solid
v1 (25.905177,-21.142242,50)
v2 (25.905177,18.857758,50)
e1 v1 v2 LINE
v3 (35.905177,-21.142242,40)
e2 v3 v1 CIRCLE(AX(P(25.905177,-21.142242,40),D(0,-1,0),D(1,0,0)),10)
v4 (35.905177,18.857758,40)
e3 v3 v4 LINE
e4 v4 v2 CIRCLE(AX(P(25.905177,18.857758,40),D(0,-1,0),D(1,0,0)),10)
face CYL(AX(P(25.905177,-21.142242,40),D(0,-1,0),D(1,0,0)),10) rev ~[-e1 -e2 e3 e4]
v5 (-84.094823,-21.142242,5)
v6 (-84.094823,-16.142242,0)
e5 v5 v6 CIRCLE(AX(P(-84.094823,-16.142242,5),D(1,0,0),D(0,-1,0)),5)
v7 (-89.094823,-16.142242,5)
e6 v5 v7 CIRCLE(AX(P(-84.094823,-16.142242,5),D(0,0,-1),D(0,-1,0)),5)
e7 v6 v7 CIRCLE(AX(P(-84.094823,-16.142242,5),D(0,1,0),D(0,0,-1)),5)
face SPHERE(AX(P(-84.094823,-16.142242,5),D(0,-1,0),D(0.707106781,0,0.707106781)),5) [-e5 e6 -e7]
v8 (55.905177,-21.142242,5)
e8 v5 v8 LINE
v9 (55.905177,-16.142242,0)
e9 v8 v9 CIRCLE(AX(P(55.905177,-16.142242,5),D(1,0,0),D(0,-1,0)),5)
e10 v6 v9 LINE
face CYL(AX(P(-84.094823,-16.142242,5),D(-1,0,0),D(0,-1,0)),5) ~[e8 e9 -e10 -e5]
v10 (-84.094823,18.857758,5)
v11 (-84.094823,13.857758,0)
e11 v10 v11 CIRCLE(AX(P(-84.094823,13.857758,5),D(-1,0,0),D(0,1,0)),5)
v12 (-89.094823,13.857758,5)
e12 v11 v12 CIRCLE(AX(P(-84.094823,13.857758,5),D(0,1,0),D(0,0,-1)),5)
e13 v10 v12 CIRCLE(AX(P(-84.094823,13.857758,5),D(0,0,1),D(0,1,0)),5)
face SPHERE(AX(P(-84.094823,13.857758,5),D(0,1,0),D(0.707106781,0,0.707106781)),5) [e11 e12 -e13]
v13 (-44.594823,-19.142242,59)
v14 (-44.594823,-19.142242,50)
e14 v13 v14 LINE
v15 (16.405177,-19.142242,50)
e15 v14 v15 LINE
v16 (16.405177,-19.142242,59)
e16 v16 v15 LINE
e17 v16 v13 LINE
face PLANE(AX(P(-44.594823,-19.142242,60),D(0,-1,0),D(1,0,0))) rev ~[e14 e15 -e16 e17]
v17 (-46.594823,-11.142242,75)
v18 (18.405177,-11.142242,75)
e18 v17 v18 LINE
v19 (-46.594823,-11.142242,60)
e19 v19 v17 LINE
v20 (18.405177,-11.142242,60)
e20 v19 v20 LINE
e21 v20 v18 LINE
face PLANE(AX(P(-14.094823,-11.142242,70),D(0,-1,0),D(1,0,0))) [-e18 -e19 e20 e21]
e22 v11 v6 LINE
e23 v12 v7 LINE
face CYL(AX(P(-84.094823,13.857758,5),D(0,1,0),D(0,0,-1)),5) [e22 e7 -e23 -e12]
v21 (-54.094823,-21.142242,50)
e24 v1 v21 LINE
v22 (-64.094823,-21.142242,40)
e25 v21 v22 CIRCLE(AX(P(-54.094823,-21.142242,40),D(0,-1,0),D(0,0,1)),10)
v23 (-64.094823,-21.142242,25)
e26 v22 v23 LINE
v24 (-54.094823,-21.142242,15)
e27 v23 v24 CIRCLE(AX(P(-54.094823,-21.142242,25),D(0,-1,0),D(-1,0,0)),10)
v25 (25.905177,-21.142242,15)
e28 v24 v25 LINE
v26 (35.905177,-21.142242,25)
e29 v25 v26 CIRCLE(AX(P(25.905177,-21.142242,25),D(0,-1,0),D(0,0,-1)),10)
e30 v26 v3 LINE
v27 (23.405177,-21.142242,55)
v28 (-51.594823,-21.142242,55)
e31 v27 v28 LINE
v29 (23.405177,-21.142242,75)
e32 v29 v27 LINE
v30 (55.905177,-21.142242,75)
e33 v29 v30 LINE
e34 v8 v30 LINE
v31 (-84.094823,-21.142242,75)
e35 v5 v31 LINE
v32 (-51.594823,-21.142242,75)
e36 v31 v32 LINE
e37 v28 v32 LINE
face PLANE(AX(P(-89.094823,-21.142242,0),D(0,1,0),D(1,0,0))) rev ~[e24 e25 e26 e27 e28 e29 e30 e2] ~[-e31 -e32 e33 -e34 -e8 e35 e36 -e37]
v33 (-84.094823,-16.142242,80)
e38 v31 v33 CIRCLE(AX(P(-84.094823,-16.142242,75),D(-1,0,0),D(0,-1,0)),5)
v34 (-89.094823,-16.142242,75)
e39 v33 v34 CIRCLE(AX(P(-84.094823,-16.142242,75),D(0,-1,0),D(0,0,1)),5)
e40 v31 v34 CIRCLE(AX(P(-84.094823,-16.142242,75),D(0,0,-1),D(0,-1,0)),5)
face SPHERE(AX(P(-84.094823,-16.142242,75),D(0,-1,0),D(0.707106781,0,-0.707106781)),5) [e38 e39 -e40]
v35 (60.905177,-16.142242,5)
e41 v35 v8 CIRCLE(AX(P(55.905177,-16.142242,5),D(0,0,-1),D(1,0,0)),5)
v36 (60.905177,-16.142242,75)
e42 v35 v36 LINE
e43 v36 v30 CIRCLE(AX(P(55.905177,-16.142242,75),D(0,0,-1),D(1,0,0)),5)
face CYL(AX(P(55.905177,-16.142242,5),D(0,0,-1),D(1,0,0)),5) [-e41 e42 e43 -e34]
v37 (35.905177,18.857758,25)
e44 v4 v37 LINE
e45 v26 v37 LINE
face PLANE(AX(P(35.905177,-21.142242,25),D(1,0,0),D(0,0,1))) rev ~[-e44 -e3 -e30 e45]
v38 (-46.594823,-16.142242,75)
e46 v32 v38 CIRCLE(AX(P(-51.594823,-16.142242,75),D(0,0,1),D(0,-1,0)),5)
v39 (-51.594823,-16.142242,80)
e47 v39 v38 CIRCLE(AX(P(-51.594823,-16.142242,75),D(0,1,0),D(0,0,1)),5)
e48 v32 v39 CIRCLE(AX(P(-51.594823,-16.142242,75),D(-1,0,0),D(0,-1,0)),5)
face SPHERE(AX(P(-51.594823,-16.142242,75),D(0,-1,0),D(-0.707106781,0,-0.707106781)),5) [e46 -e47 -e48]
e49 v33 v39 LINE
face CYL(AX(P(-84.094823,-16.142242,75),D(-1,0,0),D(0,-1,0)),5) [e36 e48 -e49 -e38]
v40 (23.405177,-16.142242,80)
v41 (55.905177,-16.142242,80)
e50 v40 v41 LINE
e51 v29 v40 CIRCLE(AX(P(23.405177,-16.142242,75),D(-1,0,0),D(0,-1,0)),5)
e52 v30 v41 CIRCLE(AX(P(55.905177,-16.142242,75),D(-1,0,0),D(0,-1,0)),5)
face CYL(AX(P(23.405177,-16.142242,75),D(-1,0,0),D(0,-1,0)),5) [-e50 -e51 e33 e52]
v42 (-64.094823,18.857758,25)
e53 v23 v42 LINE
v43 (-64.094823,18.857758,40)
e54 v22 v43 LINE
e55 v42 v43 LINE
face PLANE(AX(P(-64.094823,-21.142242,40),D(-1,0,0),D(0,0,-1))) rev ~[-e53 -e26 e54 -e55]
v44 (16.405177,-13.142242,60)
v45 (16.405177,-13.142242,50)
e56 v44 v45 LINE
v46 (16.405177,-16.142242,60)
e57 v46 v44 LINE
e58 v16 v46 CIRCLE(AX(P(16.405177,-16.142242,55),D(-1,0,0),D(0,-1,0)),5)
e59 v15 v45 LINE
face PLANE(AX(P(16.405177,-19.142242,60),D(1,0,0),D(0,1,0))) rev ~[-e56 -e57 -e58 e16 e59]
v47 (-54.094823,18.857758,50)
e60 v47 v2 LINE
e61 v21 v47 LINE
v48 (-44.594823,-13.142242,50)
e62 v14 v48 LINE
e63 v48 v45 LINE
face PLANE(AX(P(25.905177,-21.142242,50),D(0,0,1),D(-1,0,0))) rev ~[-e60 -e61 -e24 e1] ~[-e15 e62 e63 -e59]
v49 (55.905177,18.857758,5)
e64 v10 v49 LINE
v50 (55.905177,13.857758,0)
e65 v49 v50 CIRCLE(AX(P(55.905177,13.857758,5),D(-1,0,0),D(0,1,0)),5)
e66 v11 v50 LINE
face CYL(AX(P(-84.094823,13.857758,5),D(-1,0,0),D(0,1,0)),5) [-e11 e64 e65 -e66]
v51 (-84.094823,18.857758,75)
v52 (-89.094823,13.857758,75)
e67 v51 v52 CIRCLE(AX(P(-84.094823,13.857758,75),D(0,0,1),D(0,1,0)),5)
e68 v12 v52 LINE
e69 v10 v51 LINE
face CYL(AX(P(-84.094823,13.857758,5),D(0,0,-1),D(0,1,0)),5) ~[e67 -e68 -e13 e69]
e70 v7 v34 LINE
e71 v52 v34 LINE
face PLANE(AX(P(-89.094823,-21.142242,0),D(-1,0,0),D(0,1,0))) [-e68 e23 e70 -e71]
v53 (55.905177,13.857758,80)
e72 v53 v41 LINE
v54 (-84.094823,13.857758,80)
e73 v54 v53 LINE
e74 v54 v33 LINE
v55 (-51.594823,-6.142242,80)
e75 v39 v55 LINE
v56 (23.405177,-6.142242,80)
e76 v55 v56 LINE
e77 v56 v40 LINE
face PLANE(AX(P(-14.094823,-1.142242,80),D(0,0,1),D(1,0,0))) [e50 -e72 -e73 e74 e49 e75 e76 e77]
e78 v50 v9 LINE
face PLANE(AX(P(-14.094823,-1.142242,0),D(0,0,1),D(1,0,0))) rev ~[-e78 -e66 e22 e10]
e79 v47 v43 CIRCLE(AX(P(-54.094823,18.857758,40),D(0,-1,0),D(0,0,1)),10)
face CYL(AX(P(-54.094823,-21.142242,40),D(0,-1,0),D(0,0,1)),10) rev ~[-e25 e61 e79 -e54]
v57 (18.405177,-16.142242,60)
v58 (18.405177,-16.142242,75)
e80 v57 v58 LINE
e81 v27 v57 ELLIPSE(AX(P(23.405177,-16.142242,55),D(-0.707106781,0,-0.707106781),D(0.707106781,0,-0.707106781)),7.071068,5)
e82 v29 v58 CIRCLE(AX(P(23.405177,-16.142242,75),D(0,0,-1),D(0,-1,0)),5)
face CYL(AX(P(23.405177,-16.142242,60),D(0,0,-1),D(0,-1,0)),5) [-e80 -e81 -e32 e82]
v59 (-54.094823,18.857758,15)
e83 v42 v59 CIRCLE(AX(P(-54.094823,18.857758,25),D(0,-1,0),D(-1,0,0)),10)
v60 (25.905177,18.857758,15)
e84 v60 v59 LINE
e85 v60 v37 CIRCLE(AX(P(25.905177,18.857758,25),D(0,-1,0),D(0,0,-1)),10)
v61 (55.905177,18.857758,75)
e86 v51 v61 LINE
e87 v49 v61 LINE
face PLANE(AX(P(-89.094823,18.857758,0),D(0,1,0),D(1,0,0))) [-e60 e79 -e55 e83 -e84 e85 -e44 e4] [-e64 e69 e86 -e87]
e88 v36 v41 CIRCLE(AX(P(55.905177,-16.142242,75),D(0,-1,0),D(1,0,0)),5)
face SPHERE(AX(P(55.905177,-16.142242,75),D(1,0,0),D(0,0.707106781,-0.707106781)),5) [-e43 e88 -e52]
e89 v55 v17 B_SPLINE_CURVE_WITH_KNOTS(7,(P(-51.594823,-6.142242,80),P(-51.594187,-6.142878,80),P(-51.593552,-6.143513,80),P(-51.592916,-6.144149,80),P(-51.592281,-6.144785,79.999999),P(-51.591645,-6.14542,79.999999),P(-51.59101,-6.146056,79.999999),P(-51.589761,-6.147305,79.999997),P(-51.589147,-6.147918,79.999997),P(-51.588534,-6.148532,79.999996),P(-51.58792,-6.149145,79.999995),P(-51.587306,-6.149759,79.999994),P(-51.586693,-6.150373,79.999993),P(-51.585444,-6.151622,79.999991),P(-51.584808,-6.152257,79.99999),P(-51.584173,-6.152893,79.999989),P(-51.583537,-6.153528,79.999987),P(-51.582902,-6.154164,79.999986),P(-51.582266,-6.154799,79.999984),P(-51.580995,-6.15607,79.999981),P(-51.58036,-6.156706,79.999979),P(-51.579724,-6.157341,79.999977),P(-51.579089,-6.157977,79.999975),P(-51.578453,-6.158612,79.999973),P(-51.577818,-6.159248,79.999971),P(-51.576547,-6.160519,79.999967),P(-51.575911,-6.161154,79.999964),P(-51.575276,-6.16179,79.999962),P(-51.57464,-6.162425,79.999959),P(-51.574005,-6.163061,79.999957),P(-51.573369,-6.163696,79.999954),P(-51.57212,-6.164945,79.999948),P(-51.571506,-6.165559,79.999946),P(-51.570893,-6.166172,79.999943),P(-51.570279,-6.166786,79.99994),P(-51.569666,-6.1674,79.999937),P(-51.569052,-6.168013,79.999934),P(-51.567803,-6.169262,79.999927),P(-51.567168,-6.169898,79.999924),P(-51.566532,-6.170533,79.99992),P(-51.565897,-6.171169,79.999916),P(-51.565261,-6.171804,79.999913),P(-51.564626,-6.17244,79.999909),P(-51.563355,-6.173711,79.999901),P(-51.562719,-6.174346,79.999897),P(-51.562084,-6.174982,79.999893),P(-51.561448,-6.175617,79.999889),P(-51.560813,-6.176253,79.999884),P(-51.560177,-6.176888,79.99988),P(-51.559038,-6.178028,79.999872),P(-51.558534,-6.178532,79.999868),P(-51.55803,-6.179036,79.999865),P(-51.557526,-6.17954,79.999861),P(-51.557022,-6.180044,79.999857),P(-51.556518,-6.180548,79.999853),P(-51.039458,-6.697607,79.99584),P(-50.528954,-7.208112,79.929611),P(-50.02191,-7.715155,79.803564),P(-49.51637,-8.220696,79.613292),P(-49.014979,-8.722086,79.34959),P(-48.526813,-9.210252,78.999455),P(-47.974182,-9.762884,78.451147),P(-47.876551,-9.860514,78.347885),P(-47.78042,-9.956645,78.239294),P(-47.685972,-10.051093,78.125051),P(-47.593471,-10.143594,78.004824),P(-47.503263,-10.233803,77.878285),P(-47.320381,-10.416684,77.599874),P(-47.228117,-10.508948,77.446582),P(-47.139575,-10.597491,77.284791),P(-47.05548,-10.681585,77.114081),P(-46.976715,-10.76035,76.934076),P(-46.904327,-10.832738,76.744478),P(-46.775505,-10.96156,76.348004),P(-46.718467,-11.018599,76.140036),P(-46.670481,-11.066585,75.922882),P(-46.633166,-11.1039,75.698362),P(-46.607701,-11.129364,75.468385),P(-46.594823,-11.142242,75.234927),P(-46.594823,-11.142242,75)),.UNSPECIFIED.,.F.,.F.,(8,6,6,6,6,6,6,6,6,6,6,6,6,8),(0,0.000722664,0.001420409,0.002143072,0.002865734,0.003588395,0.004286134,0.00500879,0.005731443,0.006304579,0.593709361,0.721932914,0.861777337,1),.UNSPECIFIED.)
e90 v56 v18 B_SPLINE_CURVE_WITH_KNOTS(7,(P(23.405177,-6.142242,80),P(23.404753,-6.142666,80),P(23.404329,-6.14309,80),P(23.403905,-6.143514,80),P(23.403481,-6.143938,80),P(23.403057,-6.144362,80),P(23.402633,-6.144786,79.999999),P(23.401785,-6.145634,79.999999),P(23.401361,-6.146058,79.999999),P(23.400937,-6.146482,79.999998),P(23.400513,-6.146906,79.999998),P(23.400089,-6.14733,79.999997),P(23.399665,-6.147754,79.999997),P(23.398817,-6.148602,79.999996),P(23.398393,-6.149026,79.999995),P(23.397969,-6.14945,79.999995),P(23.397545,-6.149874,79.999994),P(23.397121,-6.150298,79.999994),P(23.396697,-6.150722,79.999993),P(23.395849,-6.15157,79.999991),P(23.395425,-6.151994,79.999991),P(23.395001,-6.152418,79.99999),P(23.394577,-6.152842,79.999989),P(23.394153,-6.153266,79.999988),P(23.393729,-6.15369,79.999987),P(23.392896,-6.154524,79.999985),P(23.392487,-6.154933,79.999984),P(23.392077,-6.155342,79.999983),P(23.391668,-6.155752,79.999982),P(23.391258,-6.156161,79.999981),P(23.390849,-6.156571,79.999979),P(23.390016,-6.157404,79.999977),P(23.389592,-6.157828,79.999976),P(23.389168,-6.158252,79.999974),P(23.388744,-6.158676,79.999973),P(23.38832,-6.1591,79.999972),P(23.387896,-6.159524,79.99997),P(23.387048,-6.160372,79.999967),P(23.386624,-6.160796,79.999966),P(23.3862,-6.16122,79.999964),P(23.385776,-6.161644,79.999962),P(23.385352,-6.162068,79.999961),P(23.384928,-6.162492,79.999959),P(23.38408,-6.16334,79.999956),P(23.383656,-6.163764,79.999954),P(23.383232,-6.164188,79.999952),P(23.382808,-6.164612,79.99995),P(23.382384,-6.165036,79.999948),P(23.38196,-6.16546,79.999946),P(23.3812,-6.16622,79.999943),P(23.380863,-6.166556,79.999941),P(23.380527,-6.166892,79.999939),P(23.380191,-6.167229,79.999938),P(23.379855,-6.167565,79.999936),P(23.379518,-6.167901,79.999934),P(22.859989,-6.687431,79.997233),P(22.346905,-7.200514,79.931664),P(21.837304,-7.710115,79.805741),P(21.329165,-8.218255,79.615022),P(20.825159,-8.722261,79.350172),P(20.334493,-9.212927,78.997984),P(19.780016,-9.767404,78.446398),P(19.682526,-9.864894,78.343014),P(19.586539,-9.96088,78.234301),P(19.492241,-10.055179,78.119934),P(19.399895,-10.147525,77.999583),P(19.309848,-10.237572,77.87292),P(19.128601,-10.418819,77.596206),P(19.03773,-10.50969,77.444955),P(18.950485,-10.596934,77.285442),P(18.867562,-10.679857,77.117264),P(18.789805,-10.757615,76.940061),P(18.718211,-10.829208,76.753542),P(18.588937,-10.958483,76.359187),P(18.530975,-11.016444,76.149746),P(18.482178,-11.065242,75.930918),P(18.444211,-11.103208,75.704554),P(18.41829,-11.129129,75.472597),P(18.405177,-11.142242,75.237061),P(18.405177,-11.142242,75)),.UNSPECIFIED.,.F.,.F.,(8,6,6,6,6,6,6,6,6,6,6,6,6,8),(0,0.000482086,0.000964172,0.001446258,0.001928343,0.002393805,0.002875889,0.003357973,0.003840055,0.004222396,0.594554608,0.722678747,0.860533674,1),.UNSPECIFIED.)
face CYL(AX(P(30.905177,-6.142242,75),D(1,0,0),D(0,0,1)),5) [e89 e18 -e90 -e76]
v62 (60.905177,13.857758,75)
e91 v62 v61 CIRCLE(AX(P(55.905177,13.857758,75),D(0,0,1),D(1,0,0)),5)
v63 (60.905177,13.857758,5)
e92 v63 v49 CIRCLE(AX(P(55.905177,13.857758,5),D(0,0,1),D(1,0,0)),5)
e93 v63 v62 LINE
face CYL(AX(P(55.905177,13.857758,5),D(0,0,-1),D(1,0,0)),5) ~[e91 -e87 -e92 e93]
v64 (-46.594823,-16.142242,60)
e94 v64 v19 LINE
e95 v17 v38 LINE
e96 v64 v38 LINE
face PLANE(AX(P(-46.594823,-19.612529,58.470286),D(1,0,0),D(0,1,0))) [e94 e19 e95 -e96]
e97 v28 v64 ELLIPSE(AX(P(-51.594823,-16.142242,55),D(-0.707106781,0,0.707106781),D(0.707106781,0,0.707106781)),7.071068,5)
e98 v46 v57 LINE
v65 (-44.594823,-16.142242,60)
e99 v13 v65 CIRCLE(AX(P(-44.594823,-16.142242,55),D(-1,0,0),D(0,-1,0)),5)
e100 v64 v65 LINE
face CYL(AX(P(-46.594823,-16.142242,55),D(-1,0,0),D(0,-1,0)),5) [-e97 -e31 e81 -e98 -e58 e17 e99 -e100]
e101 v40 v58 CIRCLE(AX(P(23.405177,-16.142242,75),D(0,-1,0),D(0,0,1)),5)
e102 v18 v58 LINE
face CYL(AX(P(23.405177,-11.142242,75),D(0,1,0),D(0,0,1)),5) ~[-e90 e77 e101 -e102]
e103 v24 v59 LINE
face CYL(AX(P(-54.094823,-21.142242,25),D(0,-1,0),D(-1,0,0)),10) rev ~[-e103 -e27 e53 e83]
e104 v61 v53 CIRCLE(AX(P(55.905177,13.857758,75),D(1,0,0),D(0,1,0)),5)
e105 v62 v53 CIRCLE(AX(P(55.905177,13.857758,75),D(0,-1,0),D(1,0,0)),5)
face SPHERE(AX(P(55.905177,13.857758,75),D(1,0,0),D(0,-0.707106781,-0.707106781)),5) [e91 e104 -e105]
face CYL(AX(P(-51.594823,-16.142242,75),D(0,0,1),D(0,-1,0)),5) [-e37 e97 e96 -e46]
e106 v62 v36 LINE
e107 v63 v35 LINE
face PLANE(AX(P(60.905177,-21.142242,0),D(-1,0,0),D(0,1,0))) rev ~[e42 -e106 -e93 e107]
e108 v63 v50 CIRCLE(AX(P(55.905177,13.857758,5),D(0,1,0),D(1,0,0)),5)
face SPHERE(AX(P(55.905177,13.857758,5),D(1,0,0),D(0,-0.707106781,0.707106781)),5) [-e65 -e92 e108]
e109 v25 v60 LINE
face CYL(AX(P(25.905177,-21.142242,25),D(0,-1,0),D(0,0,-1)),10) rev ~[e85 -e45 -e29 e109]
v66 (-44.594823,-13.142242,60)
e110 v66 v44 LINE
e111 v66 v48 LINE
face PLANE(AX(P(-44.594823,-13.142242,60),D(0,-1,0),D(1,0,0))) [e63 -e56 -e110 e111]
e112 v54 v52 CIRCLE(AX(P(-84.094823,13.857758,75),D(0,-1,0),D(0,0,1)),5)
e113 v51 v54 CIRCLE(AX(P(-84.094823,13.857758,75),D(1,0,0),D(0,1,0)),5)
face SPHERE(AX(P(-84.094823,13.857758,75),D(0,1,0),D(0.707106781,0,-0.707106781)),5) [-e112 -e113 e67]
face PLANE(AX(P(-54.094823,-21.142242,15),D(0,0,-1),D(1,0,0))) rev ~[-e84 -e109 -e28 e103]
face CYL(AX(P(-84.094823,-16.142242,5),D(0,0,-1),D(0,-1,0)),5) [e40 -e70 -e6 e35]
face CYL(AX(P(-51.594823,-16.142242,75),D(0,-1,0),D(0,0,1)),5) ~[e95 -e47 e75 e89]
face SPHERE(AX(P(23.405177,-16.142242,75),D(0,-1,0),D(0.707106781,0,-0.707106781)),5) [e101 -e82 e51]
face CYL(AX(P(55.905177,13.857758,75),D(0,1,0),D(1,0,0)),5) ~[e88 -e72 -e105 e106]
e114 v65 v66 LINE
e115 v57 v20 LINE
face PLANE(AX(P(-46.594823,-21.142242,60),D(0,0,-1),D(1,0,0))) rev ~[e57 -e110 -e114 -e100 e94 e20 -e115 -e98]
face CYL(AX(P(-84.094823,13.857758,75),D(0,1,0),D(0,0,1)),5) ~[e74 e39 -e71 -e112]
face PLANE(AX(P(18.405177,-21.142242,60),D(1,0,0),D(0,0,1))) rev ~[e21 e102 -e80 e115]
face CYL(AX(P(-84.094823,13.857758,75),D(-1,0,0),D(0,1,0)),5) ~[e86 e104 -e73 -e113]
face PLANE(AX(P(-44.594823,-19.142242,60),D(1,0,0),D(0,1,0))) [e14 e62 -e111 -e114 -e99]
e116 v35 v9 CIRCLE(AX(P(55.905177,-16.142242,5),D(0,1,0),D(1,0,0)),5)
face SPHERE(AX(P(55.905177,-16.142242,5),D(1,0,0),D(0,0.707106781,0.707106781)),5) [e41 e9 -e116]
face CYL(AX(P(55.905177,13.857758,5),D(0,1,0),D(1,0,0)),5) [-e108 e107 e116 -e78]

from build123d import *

# Parameters (mm, degrees)
F0_W          = 150
F0_H          = 40
F1_DEPTH      = 80
F2_W          = 65
F2_H          = 20
F3_DEPTH      = 10
F5_DEPTH      = 287
F6_W          = 61
F6_H          = 6
F7_DEPTH      = 25
F8_T1_DEPTH   = 65
F8_T3_DEPTH   = 70
F8_T5_DEPTH   = 32.5
F8_T7_DEPTH   = 32.5
F8_T9_DEPTH   = 30
F8_T11_DEPTH  = 140
F8_T13_DEPTH  = 15
F8_T15_DEPTH  = 5
F8_S19_W      = 5
F8_S19_H      = 5
F8_T20_DEPTH  = 5
F8_S25_W      = 5
F8_S25_H      = 5
F8_T26_DEPTH  = 5
F8_S31_W      = 5
F8_S31_H      = 5
F8_T32_DEPTH  = 5
F8_S37_W      = 5
F8_S37_H      = 5
F8_T38_DEPTH  = 5
F8_S43_W      = 5
F8_S43_H      = 5
F8_T44_DEPTH  = 5
F8_S49_W      = 5
F8_S49_H      = 5
F8_T50_DEPTH  = 5
F8_S55_W      = 5
F8_S55_H      = 5
F8_T56_DEPTH  = 5
F8_S61_W      = 5
F8_S61_H      = 5
F8_T62_DEPTH  = 5
F8_S67_W      = 5
F8_S67_H      = 5
F8_T68_DEPTH  = 5
F8_S73_W      = 5
F8_S73_H      = 5
F8_T74_DEPTH  = 5
F8_T81_DEPTH  = 17.5
F8_T85_DEPTH  = 77.5
F8_T92_DEPTH  = 77.5
F8_T96_DEPTH  = 17.5
F8_T103_DEPTH = 27.5
F8_T107_DEPTH = 77.5
F8_T114_DEPTH = 27.5
F8_T118_DEPTH = 77.5


# Not quite as in the source:
# - a fillet or chamfer that OpenCascade refuses, or shapes differently, is made with other operations: its cross-section is extruded or revolved along the edge and cut away or added


with BuildPart() as f1:
    # F0 (on Top) → F1 (new body)
    with BuildSketch(Plane.XY):
        with Locations((-14.0948228538, -1.1422424763)):
            Rectangle(F0_W, F0_H)
    extrude(amount=F1_DEPTH)

    # F2 (on face) → F3 (cut)
    with BuildSketch(Plane.XZ.offset(21.1422424763)):
        with Locations((-14.0948228538, 70)):
            Rectangle(F2_W, F2_H)
    extrude(amount=-F3_DEPTH, mode=Mode.SUBTRACT)

    # F4 (on face) → F5 (cut)
    with BuildSketch(Plane.XZ.offset(21.1422424763)):
        with BuildLine():
            Line((25.9051771462, 50), (-54.0948228538, 50))
            ThreePointArc((-54.0948228538, 50), (-61.1658906657, 47.0710678119), (-64.0948228538, 40))
            Line((-64.0948228538, 40), (-64.0948228538, 25))
            ThreePointArc((-64.0948228538, 25), (-61.1658906657, 17.9289321881), (-54.0948228538, 15))
            Line((-54.0948228538, 15), (25.9051771462, 15))
            ThreePointArc((25.9051771462, 15), (32.9762449581, 17.9289321881), (35.9051771462, 25))
            Line((35.9051771462, 25), (35.9051771462, 40))
            ThreePointArc((35.9051771462, 40), (32.9762449581, 47.0710678119), (25.9051771462, 50))
        make_face()
    extrude(amount=-F5_DEPTH, mode=Mode.SUBTRACT)

    # F6 (on face) → F7 (cut)
    with BuildSketch(Plane.XY.offset(60)):
        with Locations((-14.0948228538, -16.1422424763)):
            Rectangle(F6_W, F6_H)
    extrude(amount=-F7_DEPTH, mode=Mode.SUBTRACT)

    # F8: fillet of radius 5 on 19 edges, made by hand

    # F8_s2 → F8_t1 (cut)
    with BuildSketch(Plane.YZ.offset(-46.5948228538)):
        with BuildLine():
            ThreePointArc((-6.1422424763, 80), (-9.6777763823, 78.5355339059), (-11.1422424763, 75))
            Line((-11.1422424763, 75), (-11.1422424763, 80))
            Line((-11.1422424763, 80), (-6.1422424763, 80))
        make_face()
        with BuildLine():
            ThreePointArc((-21.1422424763, 55), (-19.6777763823, 58.5355339059), (-16.1422424763, 60))
            Line((-16.1422424763, 60), (-21.1422424763, 60))
            Line((-21.1422424763, 60), (-21.1422424763, 55))
        make_face()
    extrude(amount=F8_T1_DEPTH, mode=Mode.SUBTRACT)

    # F8_s4 → F8_t3 (cut)
    with BuildSketch(Plane.XY.offset(5)):
        with BuildLine():
            ThreePointArc((-84.0948228538, -21.1422424763), (-87.6303567597, -19.6777763823), (-89.0948228538, -16.1422424763))
            Line((-89.0948228538, -16.1422424763), (-89.0948228538, -21.1422424763))
            Line((-89.0948228538, -21.1422424763), (-84.0948228538, -21.1422424763))
        make_face()
        with BuildLine():
            ThreePointArc((60.9051771462, -16.1422424763), (59.4407110521, -19.6777763823), (55.9051771462, -21.1422424763))
            Line((55.9051771462, -21.1422424763), (60.9051771462, -21.1422424763))
            Line((60.9051771462, -21.1422424763), (60.9051771462, -16.1422424763))
        make_face()
        with BuildLine():
            ThreePointArc((-84.0948228538, 18.8577575237), (-87.6303567597, 17.3932914296), (-89.0948228538, 13.8577575237))
            Line((-89.0948228538, 13.8577575237), (-89.0948228538, 18.8577575237))
            Line((-89.0948228538, 18.8577575237), (-84.0948228538, 18.8577575237))
        make_face()
        with BuildLine():
            ThreePointArc((60.9051771462, 13.8577575237), (59.4407110521, 17.3932914296), (55.9051771462, 18.8577575237))
            Line((55.9051771462, 18.8577575237), (60.9051771462, 18.8577575237))
            Line((60.9051771462, 18.8577575237), (60.9051771462, 13.8577575237))
        make_face()
    extrude(amount=F8_T3_DEPTH, mode=Mode.SUBTRACT)

    # F8_s6 → F8_t5 (cut)
    with BuildSketch(Plane.YZ.offset(23.4051771462)):
        with BuildLine():
            ThreePointArc((-21.1422424763, 75), (-19.6777763823, 78.5355339059), (-16.1422424763, 80))
            Line((-16.1422424763, 80), (-21.1422424763, 80))
            Line((-21.1422424763, 80), (-21.1422424763, 75))
        make_face()
    extrude(amount=F8_T5_DEPTH, mode=Mode.SUBTRACT)

    # F8_s8 → F8_t7 (cut)
    with BuildSketch(Plane.YZ.offset(-84.0948228538)):
        with BuildLine():
            ThreePointArc((-21.1422424763, 75), (-19.6777763823, 78.5355339059), (-16.1422424763, 80))
            Line((-16.1422424763, 80), (-21.1422424763, 80))
            Line((-21.1422424763, 80), (-21.1422424763, 75))
        make_face()
    extrude(amount=F8_T7_DEPTH, mode=Mode.SUBTRACT)

    # F8_s10 → F8_t9 (cut)
    with BuildSketch(Plane.XZ.offset(-13.8577575237)):
        with BuildLine():
            ThreePointArc((60.9051771462, 5), (59.4407110521, 1.4644660941), (55.9051771462, 0))
            Line((55.9051771462, 0), (60.9051771462, 0))
            Line((60.9051771462, 0), (60.9051771462, 5))
        make_face()
        with BuildLine():
            ThreePointArc((-84.0948228538, 0), (-87.6303567597, 1.4644660941), (-89.0948228538, 5))
            Line((-89.0948228538, 5), (-89.0948228538, 0))
            Line((-89.0948228538, 0), (-84.0948228538, 0))
        make_face()
        with BuildLine():
            ThreePointArc((-84.0948228538, 80), (-87.6303567597, 78.5355339059), (-89.0948228538, 75))
            Line((-89.0948228538, 75), (-89.0948228538, 80))
            Line((-89.0948228538, 80), (-84.0948228538, 80))
        make_face()
        with BuildLine():
            ThreePointArc((60.9051771462, 75), (59.4407110521, 78.5355339059), (55.9051771462, 80))
            Line((55.9051771462, 80), (60.9051771462, 80))
            Line((60.9051771462, 80), (60.9051771462, 75))
        make_face()
    extrude(amount=F8_T9_DEPTH, mode=Mode.SUBTRACT)

    # F8_s12 → F8_t11 (cut)
    with BuildSketch(Plane.YZ.offset(-84.0948228538)):
        with BuildLine():
            ThreePointArc((18.8577575237, 5), (17.3932914296, 1.4644660941), (13.8577575237, 0))
            Line((13.8577575237, 0), (18.8577575237, 0))
            Line((18.8577575237, 0), (18.8577575237, 5))
        make_face()
        with BuildLine():
            ThreePointArc((-21.1422424763, 5), (-19.6777763823, 1.4644660941), (-16.1422424763, 0))
            Line((-16.1422424763, 0), (-21.1422424763, 0))
            Line((-21.1422424763, 0), (-21.1422424763, 5))
        make_face()
        with BuildLine():
            ThreePointArc((18.8577575237, 75), (17.3932914296, 78.5355339059), (13.8577575237, 80))
            Line((13.8577575237, 80), (18.8577575237, 80))
            Line((18.8577575237, 80), (18.8577575237, 75))
        make_face()
    extrude(amount=F8_T11_DEPTH, mode=Mode.SUBTRACT)

    # F8_s14 → F8_t13 (cut)
    with BuildSketch(Plane.XY.offset(60)):
        with BuildLine():
            ThreePointArc((-51.5948228538, -21.1422424763), (-48.0592889479, -19.6777763823), (-46.5948228538, -16.1422424763))
            Line((-46.5948228538, -16.1422424763), (-46.5948228538, -21.1422424763))
            Line((-46.5948228538, -21.1422424763), (-51.5948228538, -21.1422424763))
        make_face()
        with BuildLine():
            ThreePointArc((23.4051771462, -21.1422424763), (19.8696432403, -19.6777763823), (18.4051771462, -16.1422424763))
            Line((18.4051771462, -16.1422424763), (18.4051771462, -21.1422424763))
            Line((18.4051771462, -21.1422424763), (23.4051771462, -21.1422424763))
        make_face()
    extrude(amount=F8_T13_DEPTH, mode=Mode.SUBTRACT)

    # F8_s16 → F8_t15 (cut)
    with BuildSketch(Plane.XZ.offset(11.1422424763)):
        with BuildLine():
            ThreePointArc((-51.5948228538, 80), (-48.0592889479, 78.5355339059), (-46.5948228538, 75))
            Line((-46.5948228538, 75), (-46.5948228538, 80))
            Line((-46.5948228538, 80), (-51.5948228538, 80))
        make_face()
        with BuildLine():
            ThreePointArc((23.4051771462, 80), (19.8696432403, 78.5355339059), (18.4051771462, 75))
            Line((18.4051771462, 75), (18.4051771462, 80))
            Line((18.4051771462, 80), (23.4051771462, 80))
        make_face()
    extrude(amount=F8_T15_DEPTH, mode=Mode.SUBTRACT)


with BuildPart() as f8_tool18:
    # F8_s19 → F8_t20 (new body)
    with BuildSketch(Plane.XZ.offset(16.1422424763)):
        with Locations((-86.5948228538, 2.5)):
            Rectangle(F8_S19_W, F8_S19_H)
    extrude(amount=F8_T20_DEPTH)

    # F8_s21 → F8_t22 (revolve, cut)
    with BuildSketch(Plane(origin=(-84.0948228538, -16.1422424763, 5), x_dir=(0.7071067812, 0, 0.7071067812), z_dir=(0.7071067812, 0, -0.7071067812))):
        with BuildLine():
            ThreePointArc((0, -5), (5, 0), (0, 5))
            Line((0, 5), (0, -5))
        make_face()
    revolve(axis=Axis((-84.0948228538, -16.1422424763, 5), (0, -1, 0)), mode=Mode.SUBTRACT)


with BuildPart() as f1_1:
    add(f1.part)

    # F8_t17: cut F8_tool18
    add(f8_tool18.part, mode=Mode.SUBTRACT)


with BuildPart() as f8_tool24:
    # F8_s25 → F8_t26 (new body)
    with BuildSketch(Plane.XZ.offset(16.1422424763)):
        with Locations((-86.5948228538, 77.5)):
            Rectangle(F8_S25_W, F8_S25_H)
    extrude(amount=F8_T26_DEPTH)

    # F8_s27 → F8_t28 (revolve, cut)
    with BuildSketch(Plane(origin=(-84.0948228538, -16.1422424763, 75), x_dir=(0.7071067812, 0, -0.7071067812), z_dir=(-0.7071067812, 0, -0.7071067812))):
        with BuildLine():
            ThreePointArc((0, -5), (5, 0), (0, 5))
            Line((0, 5), (0, -5))
        make_face()
    revolve(axis=Axis((-84.0948228538, -16.1422424763, 75), (0, -1, 0)), mode=Mode.SUBTRACT)


with BuildPart() as f1_2:
    add(f1_1.part)

    # F8_t23: cut F8_tool24
    add(f8_tool24.part, mode=Mode.SUBTRACT)


with BuildPart() as f8_tool30:
    # F8_s31 → F8_t32 (new body)
    with BuildSketch(Plane.YZ.offset(55.9051771462)):
        with Locations((-18.6422424763, 2.5)):
            Rectangle(F8_S31_W, F8_S31_H)
    extrude(amount=F8_T32_DEPTH)

    # F8_s33 → F8_t34 (revolve, cut)
    with BuildSketch(Plane(origin=(55.9051771462, -16.1422424763, 5), x_dir=(0, 0.7071067812, 0.7071067812), z_dir=(0, 0.7071067812, -0.7071067812))):
        with BuildLine():
            ThreePointArc((0, -5), (5, 0), (0, 5))
            Line((0, 5), (0, -5))
        make_face()
    revolve(axis=Axis((55.9051771462, -16.1422424763, 5), (1, 0, 0)), mode=Mode.SUBTRACT)


with BuildPart() as f1_3:
    add(f1_2.part)

    # F8_t29: cut F8_tool30
    add(f8_tool30.part, mode=Mode.SUBTRACT)


with BuildPart() as f8_tool36:
    # F8_s37 → F8_t38 (new body)
    with BuildSketch(Plane.YZ.offset(55.9051771462)):
        with Locations((-18.6422424763, 77.5)):
            Rectangle(F8_S37_W, F8_S37_H)
    extrude(amount=F8_T38_DEPTH)

    # F8_s39 → F8_t40 (revolve, cut)
    with BuildSketch(Plane(origin=(55.9051771462, -16.1422424763, 75), x_dir=(0, 0.7071067812, -0.7071067812), z_dir=(0, -0.7071067812, -0.7071067812))):
        with BuildLine():
            ThreePointArc((0, -5), (5, 0), (0, 5))
            Line((0, 5), (0, -5))
        make_face()
    revolve(axis=Axis((55.9051771462, -16.1422424763, 75), (1, 0, 0)), mode=Mode.SUBTRACT)


with BuildPart() as f1_4:
    add(f1_3.part)

    # F8_t35: cut F8_tool36
    add(f8_tool36.part, mode=Mode.SUBTRACT)


with BuildPart() as f8_tool42:
    # F8_s43 → F8_t44 (new body)
    with BuildSketch(Plane.XZ.offset(16.1422424763)):
        with Locations((20.9051771462, 77.5)):
            Rectangle(F8_S43_W, F8_S43_H)
    extrude(amount=F8_T44_DEPTH)

    # F8_s45 → F8_t46 (revolve, cut)
    with BuildSketch(Plane(origin=(23.4051771462, -16.1422424763, 75), x_dir=(0.7071067812, 0, -0.7071067812), z_dir=(-0.7071067812, 0, -0.7071067812))):
        with BuildLine():
            ThreePointArc((0, -5), (5, 0), (0, 5))
            Line((0, 5), (0, -5))
        make_face()
    revolve(axis=Axis((23.4051771462, -16.1422424763, 75), (0, -1, 0)), mode=Mode.SUBTRACT)


with BuildPart() as f1_5:
    add(f1_4.part)

    # F8_t41: cut F8_tool42
    add(f8_tool42.part, mode=Mode.SUBTRACT)


with BuildPart() as f8_tool48:
    # F8_s49 → F8_t50 (new body)
    with BuildSketch(Plane.XZ.offset(16.1422424763)):
        with Locations((-49.0948228538, 77.5)):
            Rectangle(F8_S49_W, F8_S49_H)
    extrude(amount=F8_T50_DEPTH)

    # F8_s51 → F8_t52 (revolve, cut)
    with BuildSketch(Plane(origin=(-51.5948228538, -16.1422424763, 75), x_dir=(-0.7071067812, 0, -0.7071067812), z_dir=(-0.7071067812, 0, 0.7071067812))):
        with BuildLine():
            ThreePointArc((0, -5), (5, 0), (0, 5))
            Line((0, 5), (0, -5))
        make_face()
    revolve(axis=Axis((-51.5948228538, -16.1422424763, 75), (0, -1, 0)), mode=Mode.SUBTRACT)


with BuildPart() as f1_6:
    add(f1_5.part)

    # F8_t47: cut F8_tool48
    add(f8_tool48.part, mode=Mode.SUBTRACT)


with BuildPart() as f8_tool54:
    # F8_s55 → F8_t56 (new body)
    with BuildSketch(Plane.YZ.offset(55.9051771462)):
        with Locations((16.3577575237, 2.5)):
            Rectangle(F8_S55_W, F8_S55_H)
    extrude(amount=F8_T56_DEPTH)

    # F8_s57 → F8_t58 (revolve, cut)
    with BuildSketch(Plane(origin=(55.9051771462, 13.8577575237, 5), x_dir=(0, -0.7071067812, 0.7071067812), z_dir=(0, 0.7071067812, 0.7071067812))):
        with BuildLine():
            ThreePointArc((0, -5), (5, 0), (0, 5))
            Line((0, 5), (0, -5))
        make_face()
    revolve(axis=Axis((55.9051771462, 13.8577575237, 5), (1, 0, 0)), mode=Mode.SUBTRACT)


with BuildPart() as f1_7:
    add(f1_6.part)

    # F8_t53: cut F8_tool54
    add(f8_tool54.part, mode=Mode.SUBTRACT)


with BuildPart() as f8_tool60:
    # F8_s61 → F8_t62 (new body)
    with BuildSketch(Plane.XZ.offset(-13.8577575237)):
        with Locations((-86.5948228538, 2.5)):
            Rectangle(F8_S61_W, F8_S61_H)
    extrude(amount=-F8_T62_DEPTH)

    # F8_s63 → F8_t64 (revolve, cut)
    with BuildSketch(Plane(origin=(-84.0948228538, 13.8577575237, 5), x_dir=(0.7071067812, 0, 0.7071067812), z_dir=(-0.7071067812, 0, 0.7071067812))):
        with BuildLine():
            ThreePointArc((0, -5), (5, 0), (0, 5))
            Line((0, 5), (0, -5))
        make_face()
    revolve(axis=Axis((-84.0948228538, 13.8577575237, 5), (0, 1, 0)), mode=Mode.SUBTRACT)


with BuildPart() as f1_8:
    add(f1_7.part)

    # F8_t59: cut F8_tool60
    add(f8_tool60.part, mode=Mode.SUBTRACT)


with BuildPart() as f8_tool66:
    # F8_s67 → F8_t68 (new body)
    with BuildSketch(Plane.XZ.offset(-13.8577575237)):
        with Locations((-86.5948228538, 77.5)):
            Rectangle(F8_S67_W, F8_S67_H)
    extrude(amount=-F8_T68_DEPTH)

    # F8_s69 → F8_t70 (revolve, cut)
    with BuildSketch(Plane(origin=(-84.0948228538, 13.8577575237, 75), x_dir=(0.7071067812, 0, -0.7071067812), z_dir=(0.7071067812, 0, 0.7071067812))):
        with BuildLine():
            ThreePointArc((0, -5), (5, 0), (0, 5))
            Line((0, 5), (0, -5))
        make_face()
    revolve(axis=Axis((-84.0948228538, 13.8577575237, 75), (0, 1, 0)), mode=Mode.SUBTRACT)


with BuildPart() as f1_9:
    add(f1_8.part)

    # F8_t65: cut F8_tool66
    add(f8_tool66.part, mode=Mode.SUBTRACT)


with BuildPart() as f8_tool72:
    # F8_s73 → F8_t74 (new body)
    with BuildSketch(Plane.YZ.offset(55.9051771462)):
        with Locations((16.3577575237, 77.5)):
            Rectangle(F8_S73_W, F8_S73_H)
    extrude(amount=F8_T74_DEPTH)

    # F8_s75 → F8_t76 (revolve, cut)
    with BuildSketch(Plane(origin=(55.9051771462, 13.8577575237, 75), x_dir=(0, -0.7071067812, -0.7071067812), z_dir=(0, -0.7071067812, 0.7071067812))):
        with BuildLine():
            ThreePointArc((0, -5), (5, 0), (0, 5))
            Line((0, 5), (0, -5))
        make_face()
    revolve(axis=Axis((55.9051771462, 13.8577575237, 75), (1, 0, 0)), mode=Mode.SUBTRACT)


with BuildPart() as f1_10:
    add(f1_9.part)

    # F8_t71: cut F8_tool72
    add(f8_tool72.part, mode=Mode.SUBTRACT)


with BuildPart() as f8_tool79:
    # F8_s80 → F8_t81 (new body)
    with BuildSketch(Plane.XZ.offset(16.1422424763)):
        with BuildLine():
            ThreePointArc((23.4051771462, 80), (19.8696432403, 78.5355339059), (18.4051771462, 75))
            Line((18.4051771462, 75), (18.4051771462, 80))
            Line((18.4051771462, 80), (23.4051771462, 80))
        make_face()
    extrude(amount=-F8_T81_DEPTH)

    split(bisect_by=Plane.XZ.offset(11.1422424763), keep=Keep.BOTTOM)


with BuildPart() as f8_tool83:
    # F8_s84 → F8_t85 (new body)
    with BuildSketch(Plane.YZ.offset(30.9051771462)):
        with BuildLine():
            ThreePointArc((-6.1422424763, 80), (-9.6777763823, 78.5355339059), (-11.1422424763, 75))
            Line((-11.1422424763, 75), (-11.1422424763, 80))
            Line((-11.1422424763, 80), (-6.1422424763, 80))
        make_face()
    extrude(amount=-F8_T85_DEPTH)

    split(bisect_by=Plane.YZ.offset(18.4051771462), keep=Keep.TOP)


with BuildPart() as f8_tool79_1:
    add(f8_tool79.part)

    # F8_t87: intersect F8_tool83
    add(f8_tool83.part, mode=Mode.INTERSECT)


with BuildPart() as f1_11:
    add(f1_10.part)

    # F8_t77: cut F8_tool79
    add(f8_tool79_1.part, mode=Mode.SUBTRACT)


with BuildPart() as f8_tool90:
    # F8_s91 → F8_t92 (new body)
    with BuildSketch(Plane.YZ.offset(18.4051771462)):
        with BuildLine():
            ThreePointArc((-6.1422424763, 80), (-9.6777763823, 78.5355339059), (-11.1422424763, 75))
            Line((-11.1422424763, 75), (-11.1422424763, 80))
            Line((-11.1422424763, 80), (-6.1422424763, 80))
        make_face()
    extrude(amount=-F8_T92_DEPTH)

    split(bisect_by=Plane.YZ.offset(-46.5948228538), keep=Keep.BOTTOM)


with BuildPart() as f8_tool94:
    # F8_s95 → F8_t96 (new body)
    with BuildSketch(Plane.XZ.offset(16.1422424763)):
        with BuildLine():
            ThreePointArc((-51.5948228538, 80), (-48.0592889479, 78.5355339059), (-46.5948228538, 75))
            Line((-46.5948228538, 75), (-46.5948228538, 80))
            Line((-46.5948228538, 80), (-51.5948228538, 80))
        make_face()
    extrude(amount=-F8_T96_DEPTH)

    split(bisect_by=Plane.XZ.offset(11.1422424763), keep=Keep.BOTTOM)


with BuildPart() as f8_tool90_1:
    add(f8_tool90.part)

    # F8_t98: intersect F8_tool94
    add(f8_tool94.part, mode=Mode.INTERSECT)


with BuildPart() as f1_12:
    add(f1_11.part)

    # F8_t88: cut F8_tool90
    add(f8_tool90_1.part, mode=Mode.SUBTRACT)


with BuildPart() as f8_tool101:
    # F8_s102 → F8_t103 (new body)
    with BuildSketch(Plane.XY.offset(75)):
        with BuildLine():
            ThreePointArc((-51.5948228538, -21.1422424763), (-48.0592889479, -19.6777763823), (-46.5948228538, -16.1422424763))
            Line((-46.5948228538, -16.1422424763), (-46.5948228538, -21.1422424763))
            Line((-46.5948228538, -21.1422424763), (-51.5948228538, -21.1422424763))
        make_face()
    extrude(amount=-F8_T103_DEPTH)

    split(bisect_by=Plane.XY.offset(60), keep=Keep.BOTTOM)


with BuildPart() as f8_tool105:
    # F8_s106 → F8_t107 (new body)
    with BuildSketch(Plane.YZ.offset(-59.0948228538)):
        with BuildLine():
            ThreePointArc((-21.1422424763, 55), (-19.6777763823, 58.5355339059), (-16.1422424763, 60))
            Line((-16.1422424763, 60), (-21.1422424763, 60))
            Line((-21.1422424763, 60), (-21.1422424763, 55))
        make_face()
    extrude(amount=F8_T107_DEPTH)

    split(bisect_by=Plane.YZ.offset(-46.5948228538), keep=Keep.BOTTOM)


with BuildPart() as f8_tool101_1:
    add(f8_tool101.part)

    # F8_t109: intersect F8_tool105
    add(f8_tool105.part, mode=Mode.INTERSECT)


with BuildPart() as f1_13:
    add(f1_12.part)

    # F8_t99: cut F8_tool101
    add(f8_tool101_1.part, mode=Mode.SUBTRACT)


with BuildPart() as f8_tool112:
    # F8_s113 → F8_t114 (new body)
    with BuildSketch(Plane.XY.offset(47.5)):
        with BuildLine():
            ThreePointArc((23.4051771462, -21.1422424763), (19.8696432403, -19.6777763823), (18.4051771462, -16.1422424763))
            Line((18.4051771462, -16.1422424763), (18.4051771462, -21.1422424763))
            Line((18.4051771462, -21.1422424763), (23.4051771462, -21.1422424763))
        make_face()
    extrude(amount=F8_T114_DEPTH)

    split(bisect_by=Plane.XY.offset(60), keep=Keep.BOTTOM)


with BuildPart() as f8_tool116:
    # F8_s117 → F8_t118 (new body)
    with BuildSketch(Plane.YZ.offset(-46.5948228538)):
        with BuildLine():
            ThreePointArc((-21.1422424763, 55), (-19.6777763823, 58.5355339059), (-16.1422424763, 60))
            Line((-16.1422424763, 60), (-21.1422424763, 60))
            Line((-21.1422424763, 60), (-21.1422424763, 55))
        make_face()
    extrude(amount=F8_T118_DEPTH)

    split(bisect_by=Plane.YZ.offset(18.4051771462), keep=Keep.TOP)


with BuildPart() as f8_tool112_1:
    add(f8_tool112.part)

    # F8_t120: intersect F8_tool116
    add(f8_tool116.part, mode=Mode.INTERSECT)


with BuildPart() as f1_14:
    add(f1_13.part)

    # F8_t110: cut F8_tool112
    add(f8_tool112_1.part, mode=Mode.SUBTRACT)


solid = f1_14.part
